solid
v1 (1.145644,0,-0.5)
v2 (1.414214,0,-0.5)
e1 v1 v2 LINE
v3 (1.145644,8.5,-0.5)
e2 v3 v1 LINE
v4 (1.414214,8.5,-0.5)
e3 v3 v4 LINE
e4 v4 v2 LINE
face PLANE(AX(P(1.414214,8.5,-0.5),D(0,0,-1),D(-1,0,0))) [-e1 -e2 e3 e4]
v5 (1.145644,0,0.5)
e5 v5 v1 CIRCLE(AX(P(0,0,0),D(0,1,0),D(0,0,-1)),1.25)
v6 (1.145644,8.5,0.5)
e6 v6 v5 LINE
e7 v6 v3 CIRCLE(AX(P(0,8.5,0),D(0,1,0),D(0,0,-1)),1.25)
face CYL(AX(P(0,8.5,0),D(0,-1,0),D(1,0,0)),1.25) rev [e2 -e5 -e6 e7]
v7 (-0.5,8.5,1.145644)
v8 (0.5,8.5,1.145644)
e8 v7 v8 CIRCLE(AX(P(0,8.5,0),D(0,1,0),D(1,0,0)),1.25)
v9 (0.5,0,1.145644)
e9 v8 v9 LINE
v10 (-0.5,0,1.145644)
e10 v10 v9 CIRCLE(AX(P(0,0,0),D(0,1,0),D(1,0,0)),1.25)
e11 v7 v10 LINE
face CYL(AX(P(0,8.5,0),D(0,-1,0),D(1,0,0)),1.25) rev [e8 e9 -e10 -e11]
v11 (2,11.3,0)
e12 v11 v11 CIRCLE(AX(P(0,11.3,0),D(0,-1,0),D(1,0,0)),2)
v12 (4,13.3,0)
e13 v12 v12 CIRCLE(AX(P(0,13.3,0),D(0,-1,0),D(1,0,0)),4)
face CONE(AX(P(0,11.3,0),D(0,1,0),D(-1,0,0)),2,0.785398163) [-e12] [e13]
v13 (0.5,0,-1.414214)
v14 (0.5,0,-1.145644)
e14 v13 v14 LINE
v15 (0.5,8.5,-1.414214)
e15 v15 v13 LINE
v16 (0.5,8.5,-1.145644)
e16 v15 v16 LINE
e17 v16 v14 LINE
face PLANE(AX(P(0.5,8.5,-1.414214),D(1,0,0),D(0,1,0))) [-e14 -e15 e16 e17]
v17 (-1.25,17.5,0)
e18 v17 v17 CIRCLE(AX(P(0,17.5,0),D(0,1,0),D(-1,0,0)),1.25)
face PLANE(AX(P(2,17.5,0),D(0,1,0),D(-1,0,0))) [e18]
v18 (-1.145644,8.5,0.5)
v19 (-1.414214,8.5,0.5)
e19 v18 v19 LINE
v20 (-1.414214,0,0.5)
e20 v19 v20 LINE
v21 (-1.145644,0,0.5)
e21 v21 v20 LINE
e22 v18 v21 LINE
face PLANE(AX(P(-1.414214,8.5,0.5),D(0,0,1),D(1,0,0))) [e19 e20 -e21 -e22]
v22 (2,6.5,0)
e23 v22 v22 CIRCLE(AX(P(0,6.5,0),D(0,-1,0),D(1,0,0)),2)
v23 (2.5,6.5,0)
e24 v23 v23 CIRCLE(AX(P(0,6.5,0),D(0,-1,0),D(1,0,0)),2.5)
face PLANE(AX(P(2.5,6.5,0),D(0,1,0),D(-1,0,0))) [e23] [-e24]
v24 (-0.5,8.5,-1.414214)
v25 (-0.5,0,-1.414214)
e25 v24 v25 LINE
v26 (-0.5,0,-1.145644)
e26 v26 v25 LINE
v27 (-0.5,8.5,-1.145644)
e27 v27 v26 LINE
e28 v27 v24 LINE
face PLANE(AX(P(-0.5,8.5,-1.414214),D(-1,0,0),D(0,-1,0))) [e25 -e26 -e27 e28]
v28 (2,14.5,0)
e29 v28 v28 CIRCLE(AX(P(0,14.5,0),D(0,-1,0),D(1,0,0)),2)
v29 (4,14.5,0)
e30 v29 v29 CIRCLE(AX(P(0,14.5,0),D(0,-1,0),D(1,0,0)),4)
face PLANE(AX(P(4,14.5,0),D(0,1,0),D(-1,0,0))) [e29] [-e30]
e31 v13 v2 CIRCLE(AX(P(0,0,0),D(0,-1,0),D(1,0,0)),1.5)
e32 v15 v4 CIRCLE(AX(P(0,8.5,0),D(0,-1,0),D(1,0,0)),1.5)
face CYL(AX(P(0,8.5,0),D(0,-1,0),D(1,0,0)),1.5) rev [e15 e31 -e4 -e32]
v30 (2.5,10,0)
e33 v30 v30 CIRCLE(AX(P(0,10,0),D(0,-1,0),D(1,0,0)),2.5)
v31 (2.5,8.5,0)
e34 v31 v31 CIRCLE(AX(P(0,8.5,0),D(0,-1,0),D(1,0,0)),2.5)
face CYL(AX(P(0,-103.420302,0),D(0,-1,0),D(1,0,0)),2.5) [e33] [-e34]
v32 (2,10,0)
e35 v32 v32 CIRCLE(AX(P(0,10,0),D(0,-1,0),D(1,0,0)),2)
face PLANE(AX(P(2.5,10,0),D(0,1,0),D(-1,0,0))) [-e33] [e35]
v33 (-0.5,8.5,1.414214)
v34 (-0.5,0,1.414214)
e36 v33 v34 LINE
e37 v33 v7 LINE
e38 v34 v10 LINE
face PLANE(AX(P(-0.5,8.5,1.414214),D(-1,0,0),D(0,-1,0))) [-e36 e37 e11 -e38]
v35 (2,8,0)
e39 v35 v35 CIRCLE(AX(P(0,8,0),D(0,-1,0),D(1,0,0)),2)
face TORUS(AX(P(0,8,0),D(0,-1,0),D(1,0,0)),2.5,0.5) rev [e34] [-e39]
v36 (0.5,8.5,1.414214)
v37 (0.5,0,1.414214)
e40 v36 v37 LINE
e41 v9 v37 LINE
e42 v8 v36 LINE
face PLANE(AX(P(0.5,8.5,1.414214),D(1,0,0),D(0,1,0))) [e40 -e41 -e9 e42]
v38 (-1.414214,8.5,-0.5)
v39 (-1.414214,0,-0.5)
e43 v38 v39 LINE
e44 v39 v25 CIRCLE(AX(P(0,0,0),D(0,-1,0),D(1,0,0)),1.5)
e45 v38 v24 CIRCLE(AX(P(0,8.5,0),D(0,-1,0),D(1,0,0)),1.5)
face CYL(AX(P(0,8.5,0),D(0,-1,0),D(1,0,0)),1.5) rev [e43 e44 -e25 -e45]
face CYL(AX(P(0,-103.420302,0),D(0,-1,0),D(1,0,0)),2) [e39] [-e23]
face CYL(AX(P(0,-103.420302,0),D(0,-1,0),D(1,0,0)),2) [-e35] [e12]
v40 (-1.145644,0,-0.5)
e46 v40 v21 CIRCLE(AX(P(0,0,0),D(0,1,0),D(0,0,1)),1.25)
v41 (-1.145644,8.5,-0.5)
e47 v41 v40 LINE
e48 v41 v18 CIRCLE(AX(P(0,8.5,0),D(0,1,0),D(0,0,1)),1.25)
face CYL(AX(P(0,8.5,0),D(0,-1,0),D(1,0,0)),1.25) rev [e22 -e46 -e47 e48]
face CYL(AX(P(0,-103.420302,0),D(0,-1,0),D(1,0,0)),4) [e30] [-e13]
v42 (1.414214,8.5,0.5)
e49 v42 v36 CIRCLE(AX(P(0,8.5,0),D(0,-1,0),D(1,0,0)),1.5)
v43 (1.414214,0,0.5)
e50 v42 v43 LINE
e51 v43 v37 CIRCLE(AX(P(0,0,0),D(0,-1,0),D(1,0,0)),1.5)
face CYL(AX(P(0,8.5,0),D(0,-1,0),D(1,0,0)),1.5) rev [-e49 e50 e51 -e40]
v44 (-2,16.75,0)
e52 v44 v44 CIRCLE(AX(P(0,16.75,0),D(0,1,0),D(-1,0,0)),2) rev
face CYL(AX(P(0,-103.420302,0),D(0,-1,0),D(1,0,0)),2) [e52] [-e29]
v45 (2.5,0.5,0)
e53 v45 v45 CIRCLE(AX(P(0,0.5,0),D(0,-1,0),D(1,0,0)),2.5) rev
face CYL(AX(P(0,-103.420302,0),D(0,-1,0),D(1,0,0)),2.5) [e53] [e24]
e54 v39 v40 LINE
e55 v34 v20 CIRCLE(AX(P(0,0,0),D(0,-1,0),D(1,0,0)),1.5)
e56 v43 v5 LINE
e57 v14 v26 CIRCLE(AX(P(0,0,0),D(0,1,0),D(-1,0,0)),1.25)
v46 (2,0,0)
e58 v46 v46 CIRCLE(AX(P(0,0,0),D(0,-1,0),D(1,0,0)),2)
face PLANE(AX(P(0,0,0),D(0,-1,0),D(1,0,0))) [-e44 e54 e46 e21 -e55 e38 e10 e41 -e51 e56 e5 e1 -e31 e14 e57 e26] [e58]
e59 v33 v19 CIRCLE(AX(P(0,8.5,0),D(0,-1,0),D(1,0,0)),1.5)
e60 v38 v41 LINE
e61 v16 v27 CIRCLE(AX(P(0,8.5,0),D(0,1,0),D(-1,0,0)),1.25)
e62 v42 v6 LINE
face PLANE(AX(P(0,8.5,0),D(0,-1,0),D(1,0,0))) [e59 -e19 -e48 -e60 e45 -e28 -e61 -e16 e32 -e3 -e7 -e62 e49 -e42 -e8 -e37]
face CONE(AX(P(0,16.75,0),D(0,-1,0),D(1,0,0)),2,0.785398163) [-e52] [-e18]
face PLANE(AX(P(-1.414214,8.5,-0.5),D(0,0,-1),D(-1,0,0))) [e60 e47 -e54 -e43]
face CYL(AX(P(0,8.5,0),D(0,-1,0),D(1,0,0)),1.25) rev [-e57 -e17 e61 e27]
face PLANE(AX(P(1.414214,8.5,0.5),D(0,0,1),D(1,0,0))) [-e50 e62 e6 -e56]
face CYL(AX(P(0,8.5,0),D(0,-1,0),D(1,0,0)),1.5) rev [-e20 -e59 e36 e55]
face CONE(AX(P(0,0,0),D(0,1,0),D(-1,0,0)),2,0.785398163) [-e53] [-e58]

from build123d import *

# Parameters (mm, degrees)
FILLET1_R           = 0.5
CHAMFER1_SIZE       = 0.5
CHAMFER2_SIZE       = 0.75
SKETCH4_R           = 1.5
CUT_EXTRUDE2_DEPTH  = 8.5
BOSS_EXTRUDE1_DEPTH = 8.5
CIRPATTERN1_COUNT   = 4


with BuildPart() as part:
    # Sketch1 → Revolve1 (revolve)
    with BuildSketch(Plane.XY):
        Polygon((0, 0), (2.5, 0), (2.5, 6.5), (2, 6.5), (2, 8.5), (2.5, 8.5), (2.5, 10), (2, 10), (2, 11.3), (4, 13.3), (4, 14.5), (2, 14.5), (2, 17.5), (0, 17.5), align=None)
    revolve(axis=Axis((0, -103.420301815, 0), (0, 1, 0)))

    # Fillet1
    fillet1_edges = [part.edges().sort_by_distance(p)[0] for p in [
        (-2, 8.5, 0),
    ]]
    fillet(fillet1_edges, radius=FILLET1_R - 0.0001)  # a hair under: the kernel refuses the full size

    # Chamfer1
    chamfer1_edges = [part.edges().sort_by_distance(p)[0] for p in [
        (-2.5, 0, 0),
    ]]
    chamfer(chamfer1_edges, length=CHAMFER1_SIZE)

    # Chamfer2
    chamfer2_edges = [part.edges().sort_by_distance(p)[0] for p in [
        (-2, 17.5, 0),
    ]]
    chamfer(chamfer2_edges, length=CHAMFER2_SIZE)

    # Sketch4 → Cut-Extrude2 (cut)
    with BuildSketch(Plane.XZ):
        Circle(SKETCH4_R)
    extrude(amount=-CUT_EXTRUDE2_DEPTH, mode=Mode.SUBTRACT)

    # Sketch6 → Boss-Extrude1 (add)
    with BuildSketch(Plane.XZ):
        with BuildLine():
            Line((-0.5, 1.414213562), (-0.5, 1.145643924))
            ThreePointArc((-0.5, 1.145643924), (0, 1.25), (0.5, 1.145643924))
            Line((0.5, 1.145643924), (0.5, 1.414213562))
            ThreePointArc((0.5, 1.414213562), (0, 1.5), (-0.5, 1.414213562))
        make_face()
    boss_extrude1 = extrude(amount=-BOSS_EXTRUDE1_DEPTH)

    # CirPattern1: Boss-Extrude1 ×4 about axis
    cirpattern1_axis = Axis((0, 0, 0), (0, 1, 0))
    for i in range(1, CIRPATTERN1_COUNT):
        add(boss_extrude1.rotate(cirpattern1_axis, i * 360 / CIRPATTERN1_COUNT))


solid = part.part
